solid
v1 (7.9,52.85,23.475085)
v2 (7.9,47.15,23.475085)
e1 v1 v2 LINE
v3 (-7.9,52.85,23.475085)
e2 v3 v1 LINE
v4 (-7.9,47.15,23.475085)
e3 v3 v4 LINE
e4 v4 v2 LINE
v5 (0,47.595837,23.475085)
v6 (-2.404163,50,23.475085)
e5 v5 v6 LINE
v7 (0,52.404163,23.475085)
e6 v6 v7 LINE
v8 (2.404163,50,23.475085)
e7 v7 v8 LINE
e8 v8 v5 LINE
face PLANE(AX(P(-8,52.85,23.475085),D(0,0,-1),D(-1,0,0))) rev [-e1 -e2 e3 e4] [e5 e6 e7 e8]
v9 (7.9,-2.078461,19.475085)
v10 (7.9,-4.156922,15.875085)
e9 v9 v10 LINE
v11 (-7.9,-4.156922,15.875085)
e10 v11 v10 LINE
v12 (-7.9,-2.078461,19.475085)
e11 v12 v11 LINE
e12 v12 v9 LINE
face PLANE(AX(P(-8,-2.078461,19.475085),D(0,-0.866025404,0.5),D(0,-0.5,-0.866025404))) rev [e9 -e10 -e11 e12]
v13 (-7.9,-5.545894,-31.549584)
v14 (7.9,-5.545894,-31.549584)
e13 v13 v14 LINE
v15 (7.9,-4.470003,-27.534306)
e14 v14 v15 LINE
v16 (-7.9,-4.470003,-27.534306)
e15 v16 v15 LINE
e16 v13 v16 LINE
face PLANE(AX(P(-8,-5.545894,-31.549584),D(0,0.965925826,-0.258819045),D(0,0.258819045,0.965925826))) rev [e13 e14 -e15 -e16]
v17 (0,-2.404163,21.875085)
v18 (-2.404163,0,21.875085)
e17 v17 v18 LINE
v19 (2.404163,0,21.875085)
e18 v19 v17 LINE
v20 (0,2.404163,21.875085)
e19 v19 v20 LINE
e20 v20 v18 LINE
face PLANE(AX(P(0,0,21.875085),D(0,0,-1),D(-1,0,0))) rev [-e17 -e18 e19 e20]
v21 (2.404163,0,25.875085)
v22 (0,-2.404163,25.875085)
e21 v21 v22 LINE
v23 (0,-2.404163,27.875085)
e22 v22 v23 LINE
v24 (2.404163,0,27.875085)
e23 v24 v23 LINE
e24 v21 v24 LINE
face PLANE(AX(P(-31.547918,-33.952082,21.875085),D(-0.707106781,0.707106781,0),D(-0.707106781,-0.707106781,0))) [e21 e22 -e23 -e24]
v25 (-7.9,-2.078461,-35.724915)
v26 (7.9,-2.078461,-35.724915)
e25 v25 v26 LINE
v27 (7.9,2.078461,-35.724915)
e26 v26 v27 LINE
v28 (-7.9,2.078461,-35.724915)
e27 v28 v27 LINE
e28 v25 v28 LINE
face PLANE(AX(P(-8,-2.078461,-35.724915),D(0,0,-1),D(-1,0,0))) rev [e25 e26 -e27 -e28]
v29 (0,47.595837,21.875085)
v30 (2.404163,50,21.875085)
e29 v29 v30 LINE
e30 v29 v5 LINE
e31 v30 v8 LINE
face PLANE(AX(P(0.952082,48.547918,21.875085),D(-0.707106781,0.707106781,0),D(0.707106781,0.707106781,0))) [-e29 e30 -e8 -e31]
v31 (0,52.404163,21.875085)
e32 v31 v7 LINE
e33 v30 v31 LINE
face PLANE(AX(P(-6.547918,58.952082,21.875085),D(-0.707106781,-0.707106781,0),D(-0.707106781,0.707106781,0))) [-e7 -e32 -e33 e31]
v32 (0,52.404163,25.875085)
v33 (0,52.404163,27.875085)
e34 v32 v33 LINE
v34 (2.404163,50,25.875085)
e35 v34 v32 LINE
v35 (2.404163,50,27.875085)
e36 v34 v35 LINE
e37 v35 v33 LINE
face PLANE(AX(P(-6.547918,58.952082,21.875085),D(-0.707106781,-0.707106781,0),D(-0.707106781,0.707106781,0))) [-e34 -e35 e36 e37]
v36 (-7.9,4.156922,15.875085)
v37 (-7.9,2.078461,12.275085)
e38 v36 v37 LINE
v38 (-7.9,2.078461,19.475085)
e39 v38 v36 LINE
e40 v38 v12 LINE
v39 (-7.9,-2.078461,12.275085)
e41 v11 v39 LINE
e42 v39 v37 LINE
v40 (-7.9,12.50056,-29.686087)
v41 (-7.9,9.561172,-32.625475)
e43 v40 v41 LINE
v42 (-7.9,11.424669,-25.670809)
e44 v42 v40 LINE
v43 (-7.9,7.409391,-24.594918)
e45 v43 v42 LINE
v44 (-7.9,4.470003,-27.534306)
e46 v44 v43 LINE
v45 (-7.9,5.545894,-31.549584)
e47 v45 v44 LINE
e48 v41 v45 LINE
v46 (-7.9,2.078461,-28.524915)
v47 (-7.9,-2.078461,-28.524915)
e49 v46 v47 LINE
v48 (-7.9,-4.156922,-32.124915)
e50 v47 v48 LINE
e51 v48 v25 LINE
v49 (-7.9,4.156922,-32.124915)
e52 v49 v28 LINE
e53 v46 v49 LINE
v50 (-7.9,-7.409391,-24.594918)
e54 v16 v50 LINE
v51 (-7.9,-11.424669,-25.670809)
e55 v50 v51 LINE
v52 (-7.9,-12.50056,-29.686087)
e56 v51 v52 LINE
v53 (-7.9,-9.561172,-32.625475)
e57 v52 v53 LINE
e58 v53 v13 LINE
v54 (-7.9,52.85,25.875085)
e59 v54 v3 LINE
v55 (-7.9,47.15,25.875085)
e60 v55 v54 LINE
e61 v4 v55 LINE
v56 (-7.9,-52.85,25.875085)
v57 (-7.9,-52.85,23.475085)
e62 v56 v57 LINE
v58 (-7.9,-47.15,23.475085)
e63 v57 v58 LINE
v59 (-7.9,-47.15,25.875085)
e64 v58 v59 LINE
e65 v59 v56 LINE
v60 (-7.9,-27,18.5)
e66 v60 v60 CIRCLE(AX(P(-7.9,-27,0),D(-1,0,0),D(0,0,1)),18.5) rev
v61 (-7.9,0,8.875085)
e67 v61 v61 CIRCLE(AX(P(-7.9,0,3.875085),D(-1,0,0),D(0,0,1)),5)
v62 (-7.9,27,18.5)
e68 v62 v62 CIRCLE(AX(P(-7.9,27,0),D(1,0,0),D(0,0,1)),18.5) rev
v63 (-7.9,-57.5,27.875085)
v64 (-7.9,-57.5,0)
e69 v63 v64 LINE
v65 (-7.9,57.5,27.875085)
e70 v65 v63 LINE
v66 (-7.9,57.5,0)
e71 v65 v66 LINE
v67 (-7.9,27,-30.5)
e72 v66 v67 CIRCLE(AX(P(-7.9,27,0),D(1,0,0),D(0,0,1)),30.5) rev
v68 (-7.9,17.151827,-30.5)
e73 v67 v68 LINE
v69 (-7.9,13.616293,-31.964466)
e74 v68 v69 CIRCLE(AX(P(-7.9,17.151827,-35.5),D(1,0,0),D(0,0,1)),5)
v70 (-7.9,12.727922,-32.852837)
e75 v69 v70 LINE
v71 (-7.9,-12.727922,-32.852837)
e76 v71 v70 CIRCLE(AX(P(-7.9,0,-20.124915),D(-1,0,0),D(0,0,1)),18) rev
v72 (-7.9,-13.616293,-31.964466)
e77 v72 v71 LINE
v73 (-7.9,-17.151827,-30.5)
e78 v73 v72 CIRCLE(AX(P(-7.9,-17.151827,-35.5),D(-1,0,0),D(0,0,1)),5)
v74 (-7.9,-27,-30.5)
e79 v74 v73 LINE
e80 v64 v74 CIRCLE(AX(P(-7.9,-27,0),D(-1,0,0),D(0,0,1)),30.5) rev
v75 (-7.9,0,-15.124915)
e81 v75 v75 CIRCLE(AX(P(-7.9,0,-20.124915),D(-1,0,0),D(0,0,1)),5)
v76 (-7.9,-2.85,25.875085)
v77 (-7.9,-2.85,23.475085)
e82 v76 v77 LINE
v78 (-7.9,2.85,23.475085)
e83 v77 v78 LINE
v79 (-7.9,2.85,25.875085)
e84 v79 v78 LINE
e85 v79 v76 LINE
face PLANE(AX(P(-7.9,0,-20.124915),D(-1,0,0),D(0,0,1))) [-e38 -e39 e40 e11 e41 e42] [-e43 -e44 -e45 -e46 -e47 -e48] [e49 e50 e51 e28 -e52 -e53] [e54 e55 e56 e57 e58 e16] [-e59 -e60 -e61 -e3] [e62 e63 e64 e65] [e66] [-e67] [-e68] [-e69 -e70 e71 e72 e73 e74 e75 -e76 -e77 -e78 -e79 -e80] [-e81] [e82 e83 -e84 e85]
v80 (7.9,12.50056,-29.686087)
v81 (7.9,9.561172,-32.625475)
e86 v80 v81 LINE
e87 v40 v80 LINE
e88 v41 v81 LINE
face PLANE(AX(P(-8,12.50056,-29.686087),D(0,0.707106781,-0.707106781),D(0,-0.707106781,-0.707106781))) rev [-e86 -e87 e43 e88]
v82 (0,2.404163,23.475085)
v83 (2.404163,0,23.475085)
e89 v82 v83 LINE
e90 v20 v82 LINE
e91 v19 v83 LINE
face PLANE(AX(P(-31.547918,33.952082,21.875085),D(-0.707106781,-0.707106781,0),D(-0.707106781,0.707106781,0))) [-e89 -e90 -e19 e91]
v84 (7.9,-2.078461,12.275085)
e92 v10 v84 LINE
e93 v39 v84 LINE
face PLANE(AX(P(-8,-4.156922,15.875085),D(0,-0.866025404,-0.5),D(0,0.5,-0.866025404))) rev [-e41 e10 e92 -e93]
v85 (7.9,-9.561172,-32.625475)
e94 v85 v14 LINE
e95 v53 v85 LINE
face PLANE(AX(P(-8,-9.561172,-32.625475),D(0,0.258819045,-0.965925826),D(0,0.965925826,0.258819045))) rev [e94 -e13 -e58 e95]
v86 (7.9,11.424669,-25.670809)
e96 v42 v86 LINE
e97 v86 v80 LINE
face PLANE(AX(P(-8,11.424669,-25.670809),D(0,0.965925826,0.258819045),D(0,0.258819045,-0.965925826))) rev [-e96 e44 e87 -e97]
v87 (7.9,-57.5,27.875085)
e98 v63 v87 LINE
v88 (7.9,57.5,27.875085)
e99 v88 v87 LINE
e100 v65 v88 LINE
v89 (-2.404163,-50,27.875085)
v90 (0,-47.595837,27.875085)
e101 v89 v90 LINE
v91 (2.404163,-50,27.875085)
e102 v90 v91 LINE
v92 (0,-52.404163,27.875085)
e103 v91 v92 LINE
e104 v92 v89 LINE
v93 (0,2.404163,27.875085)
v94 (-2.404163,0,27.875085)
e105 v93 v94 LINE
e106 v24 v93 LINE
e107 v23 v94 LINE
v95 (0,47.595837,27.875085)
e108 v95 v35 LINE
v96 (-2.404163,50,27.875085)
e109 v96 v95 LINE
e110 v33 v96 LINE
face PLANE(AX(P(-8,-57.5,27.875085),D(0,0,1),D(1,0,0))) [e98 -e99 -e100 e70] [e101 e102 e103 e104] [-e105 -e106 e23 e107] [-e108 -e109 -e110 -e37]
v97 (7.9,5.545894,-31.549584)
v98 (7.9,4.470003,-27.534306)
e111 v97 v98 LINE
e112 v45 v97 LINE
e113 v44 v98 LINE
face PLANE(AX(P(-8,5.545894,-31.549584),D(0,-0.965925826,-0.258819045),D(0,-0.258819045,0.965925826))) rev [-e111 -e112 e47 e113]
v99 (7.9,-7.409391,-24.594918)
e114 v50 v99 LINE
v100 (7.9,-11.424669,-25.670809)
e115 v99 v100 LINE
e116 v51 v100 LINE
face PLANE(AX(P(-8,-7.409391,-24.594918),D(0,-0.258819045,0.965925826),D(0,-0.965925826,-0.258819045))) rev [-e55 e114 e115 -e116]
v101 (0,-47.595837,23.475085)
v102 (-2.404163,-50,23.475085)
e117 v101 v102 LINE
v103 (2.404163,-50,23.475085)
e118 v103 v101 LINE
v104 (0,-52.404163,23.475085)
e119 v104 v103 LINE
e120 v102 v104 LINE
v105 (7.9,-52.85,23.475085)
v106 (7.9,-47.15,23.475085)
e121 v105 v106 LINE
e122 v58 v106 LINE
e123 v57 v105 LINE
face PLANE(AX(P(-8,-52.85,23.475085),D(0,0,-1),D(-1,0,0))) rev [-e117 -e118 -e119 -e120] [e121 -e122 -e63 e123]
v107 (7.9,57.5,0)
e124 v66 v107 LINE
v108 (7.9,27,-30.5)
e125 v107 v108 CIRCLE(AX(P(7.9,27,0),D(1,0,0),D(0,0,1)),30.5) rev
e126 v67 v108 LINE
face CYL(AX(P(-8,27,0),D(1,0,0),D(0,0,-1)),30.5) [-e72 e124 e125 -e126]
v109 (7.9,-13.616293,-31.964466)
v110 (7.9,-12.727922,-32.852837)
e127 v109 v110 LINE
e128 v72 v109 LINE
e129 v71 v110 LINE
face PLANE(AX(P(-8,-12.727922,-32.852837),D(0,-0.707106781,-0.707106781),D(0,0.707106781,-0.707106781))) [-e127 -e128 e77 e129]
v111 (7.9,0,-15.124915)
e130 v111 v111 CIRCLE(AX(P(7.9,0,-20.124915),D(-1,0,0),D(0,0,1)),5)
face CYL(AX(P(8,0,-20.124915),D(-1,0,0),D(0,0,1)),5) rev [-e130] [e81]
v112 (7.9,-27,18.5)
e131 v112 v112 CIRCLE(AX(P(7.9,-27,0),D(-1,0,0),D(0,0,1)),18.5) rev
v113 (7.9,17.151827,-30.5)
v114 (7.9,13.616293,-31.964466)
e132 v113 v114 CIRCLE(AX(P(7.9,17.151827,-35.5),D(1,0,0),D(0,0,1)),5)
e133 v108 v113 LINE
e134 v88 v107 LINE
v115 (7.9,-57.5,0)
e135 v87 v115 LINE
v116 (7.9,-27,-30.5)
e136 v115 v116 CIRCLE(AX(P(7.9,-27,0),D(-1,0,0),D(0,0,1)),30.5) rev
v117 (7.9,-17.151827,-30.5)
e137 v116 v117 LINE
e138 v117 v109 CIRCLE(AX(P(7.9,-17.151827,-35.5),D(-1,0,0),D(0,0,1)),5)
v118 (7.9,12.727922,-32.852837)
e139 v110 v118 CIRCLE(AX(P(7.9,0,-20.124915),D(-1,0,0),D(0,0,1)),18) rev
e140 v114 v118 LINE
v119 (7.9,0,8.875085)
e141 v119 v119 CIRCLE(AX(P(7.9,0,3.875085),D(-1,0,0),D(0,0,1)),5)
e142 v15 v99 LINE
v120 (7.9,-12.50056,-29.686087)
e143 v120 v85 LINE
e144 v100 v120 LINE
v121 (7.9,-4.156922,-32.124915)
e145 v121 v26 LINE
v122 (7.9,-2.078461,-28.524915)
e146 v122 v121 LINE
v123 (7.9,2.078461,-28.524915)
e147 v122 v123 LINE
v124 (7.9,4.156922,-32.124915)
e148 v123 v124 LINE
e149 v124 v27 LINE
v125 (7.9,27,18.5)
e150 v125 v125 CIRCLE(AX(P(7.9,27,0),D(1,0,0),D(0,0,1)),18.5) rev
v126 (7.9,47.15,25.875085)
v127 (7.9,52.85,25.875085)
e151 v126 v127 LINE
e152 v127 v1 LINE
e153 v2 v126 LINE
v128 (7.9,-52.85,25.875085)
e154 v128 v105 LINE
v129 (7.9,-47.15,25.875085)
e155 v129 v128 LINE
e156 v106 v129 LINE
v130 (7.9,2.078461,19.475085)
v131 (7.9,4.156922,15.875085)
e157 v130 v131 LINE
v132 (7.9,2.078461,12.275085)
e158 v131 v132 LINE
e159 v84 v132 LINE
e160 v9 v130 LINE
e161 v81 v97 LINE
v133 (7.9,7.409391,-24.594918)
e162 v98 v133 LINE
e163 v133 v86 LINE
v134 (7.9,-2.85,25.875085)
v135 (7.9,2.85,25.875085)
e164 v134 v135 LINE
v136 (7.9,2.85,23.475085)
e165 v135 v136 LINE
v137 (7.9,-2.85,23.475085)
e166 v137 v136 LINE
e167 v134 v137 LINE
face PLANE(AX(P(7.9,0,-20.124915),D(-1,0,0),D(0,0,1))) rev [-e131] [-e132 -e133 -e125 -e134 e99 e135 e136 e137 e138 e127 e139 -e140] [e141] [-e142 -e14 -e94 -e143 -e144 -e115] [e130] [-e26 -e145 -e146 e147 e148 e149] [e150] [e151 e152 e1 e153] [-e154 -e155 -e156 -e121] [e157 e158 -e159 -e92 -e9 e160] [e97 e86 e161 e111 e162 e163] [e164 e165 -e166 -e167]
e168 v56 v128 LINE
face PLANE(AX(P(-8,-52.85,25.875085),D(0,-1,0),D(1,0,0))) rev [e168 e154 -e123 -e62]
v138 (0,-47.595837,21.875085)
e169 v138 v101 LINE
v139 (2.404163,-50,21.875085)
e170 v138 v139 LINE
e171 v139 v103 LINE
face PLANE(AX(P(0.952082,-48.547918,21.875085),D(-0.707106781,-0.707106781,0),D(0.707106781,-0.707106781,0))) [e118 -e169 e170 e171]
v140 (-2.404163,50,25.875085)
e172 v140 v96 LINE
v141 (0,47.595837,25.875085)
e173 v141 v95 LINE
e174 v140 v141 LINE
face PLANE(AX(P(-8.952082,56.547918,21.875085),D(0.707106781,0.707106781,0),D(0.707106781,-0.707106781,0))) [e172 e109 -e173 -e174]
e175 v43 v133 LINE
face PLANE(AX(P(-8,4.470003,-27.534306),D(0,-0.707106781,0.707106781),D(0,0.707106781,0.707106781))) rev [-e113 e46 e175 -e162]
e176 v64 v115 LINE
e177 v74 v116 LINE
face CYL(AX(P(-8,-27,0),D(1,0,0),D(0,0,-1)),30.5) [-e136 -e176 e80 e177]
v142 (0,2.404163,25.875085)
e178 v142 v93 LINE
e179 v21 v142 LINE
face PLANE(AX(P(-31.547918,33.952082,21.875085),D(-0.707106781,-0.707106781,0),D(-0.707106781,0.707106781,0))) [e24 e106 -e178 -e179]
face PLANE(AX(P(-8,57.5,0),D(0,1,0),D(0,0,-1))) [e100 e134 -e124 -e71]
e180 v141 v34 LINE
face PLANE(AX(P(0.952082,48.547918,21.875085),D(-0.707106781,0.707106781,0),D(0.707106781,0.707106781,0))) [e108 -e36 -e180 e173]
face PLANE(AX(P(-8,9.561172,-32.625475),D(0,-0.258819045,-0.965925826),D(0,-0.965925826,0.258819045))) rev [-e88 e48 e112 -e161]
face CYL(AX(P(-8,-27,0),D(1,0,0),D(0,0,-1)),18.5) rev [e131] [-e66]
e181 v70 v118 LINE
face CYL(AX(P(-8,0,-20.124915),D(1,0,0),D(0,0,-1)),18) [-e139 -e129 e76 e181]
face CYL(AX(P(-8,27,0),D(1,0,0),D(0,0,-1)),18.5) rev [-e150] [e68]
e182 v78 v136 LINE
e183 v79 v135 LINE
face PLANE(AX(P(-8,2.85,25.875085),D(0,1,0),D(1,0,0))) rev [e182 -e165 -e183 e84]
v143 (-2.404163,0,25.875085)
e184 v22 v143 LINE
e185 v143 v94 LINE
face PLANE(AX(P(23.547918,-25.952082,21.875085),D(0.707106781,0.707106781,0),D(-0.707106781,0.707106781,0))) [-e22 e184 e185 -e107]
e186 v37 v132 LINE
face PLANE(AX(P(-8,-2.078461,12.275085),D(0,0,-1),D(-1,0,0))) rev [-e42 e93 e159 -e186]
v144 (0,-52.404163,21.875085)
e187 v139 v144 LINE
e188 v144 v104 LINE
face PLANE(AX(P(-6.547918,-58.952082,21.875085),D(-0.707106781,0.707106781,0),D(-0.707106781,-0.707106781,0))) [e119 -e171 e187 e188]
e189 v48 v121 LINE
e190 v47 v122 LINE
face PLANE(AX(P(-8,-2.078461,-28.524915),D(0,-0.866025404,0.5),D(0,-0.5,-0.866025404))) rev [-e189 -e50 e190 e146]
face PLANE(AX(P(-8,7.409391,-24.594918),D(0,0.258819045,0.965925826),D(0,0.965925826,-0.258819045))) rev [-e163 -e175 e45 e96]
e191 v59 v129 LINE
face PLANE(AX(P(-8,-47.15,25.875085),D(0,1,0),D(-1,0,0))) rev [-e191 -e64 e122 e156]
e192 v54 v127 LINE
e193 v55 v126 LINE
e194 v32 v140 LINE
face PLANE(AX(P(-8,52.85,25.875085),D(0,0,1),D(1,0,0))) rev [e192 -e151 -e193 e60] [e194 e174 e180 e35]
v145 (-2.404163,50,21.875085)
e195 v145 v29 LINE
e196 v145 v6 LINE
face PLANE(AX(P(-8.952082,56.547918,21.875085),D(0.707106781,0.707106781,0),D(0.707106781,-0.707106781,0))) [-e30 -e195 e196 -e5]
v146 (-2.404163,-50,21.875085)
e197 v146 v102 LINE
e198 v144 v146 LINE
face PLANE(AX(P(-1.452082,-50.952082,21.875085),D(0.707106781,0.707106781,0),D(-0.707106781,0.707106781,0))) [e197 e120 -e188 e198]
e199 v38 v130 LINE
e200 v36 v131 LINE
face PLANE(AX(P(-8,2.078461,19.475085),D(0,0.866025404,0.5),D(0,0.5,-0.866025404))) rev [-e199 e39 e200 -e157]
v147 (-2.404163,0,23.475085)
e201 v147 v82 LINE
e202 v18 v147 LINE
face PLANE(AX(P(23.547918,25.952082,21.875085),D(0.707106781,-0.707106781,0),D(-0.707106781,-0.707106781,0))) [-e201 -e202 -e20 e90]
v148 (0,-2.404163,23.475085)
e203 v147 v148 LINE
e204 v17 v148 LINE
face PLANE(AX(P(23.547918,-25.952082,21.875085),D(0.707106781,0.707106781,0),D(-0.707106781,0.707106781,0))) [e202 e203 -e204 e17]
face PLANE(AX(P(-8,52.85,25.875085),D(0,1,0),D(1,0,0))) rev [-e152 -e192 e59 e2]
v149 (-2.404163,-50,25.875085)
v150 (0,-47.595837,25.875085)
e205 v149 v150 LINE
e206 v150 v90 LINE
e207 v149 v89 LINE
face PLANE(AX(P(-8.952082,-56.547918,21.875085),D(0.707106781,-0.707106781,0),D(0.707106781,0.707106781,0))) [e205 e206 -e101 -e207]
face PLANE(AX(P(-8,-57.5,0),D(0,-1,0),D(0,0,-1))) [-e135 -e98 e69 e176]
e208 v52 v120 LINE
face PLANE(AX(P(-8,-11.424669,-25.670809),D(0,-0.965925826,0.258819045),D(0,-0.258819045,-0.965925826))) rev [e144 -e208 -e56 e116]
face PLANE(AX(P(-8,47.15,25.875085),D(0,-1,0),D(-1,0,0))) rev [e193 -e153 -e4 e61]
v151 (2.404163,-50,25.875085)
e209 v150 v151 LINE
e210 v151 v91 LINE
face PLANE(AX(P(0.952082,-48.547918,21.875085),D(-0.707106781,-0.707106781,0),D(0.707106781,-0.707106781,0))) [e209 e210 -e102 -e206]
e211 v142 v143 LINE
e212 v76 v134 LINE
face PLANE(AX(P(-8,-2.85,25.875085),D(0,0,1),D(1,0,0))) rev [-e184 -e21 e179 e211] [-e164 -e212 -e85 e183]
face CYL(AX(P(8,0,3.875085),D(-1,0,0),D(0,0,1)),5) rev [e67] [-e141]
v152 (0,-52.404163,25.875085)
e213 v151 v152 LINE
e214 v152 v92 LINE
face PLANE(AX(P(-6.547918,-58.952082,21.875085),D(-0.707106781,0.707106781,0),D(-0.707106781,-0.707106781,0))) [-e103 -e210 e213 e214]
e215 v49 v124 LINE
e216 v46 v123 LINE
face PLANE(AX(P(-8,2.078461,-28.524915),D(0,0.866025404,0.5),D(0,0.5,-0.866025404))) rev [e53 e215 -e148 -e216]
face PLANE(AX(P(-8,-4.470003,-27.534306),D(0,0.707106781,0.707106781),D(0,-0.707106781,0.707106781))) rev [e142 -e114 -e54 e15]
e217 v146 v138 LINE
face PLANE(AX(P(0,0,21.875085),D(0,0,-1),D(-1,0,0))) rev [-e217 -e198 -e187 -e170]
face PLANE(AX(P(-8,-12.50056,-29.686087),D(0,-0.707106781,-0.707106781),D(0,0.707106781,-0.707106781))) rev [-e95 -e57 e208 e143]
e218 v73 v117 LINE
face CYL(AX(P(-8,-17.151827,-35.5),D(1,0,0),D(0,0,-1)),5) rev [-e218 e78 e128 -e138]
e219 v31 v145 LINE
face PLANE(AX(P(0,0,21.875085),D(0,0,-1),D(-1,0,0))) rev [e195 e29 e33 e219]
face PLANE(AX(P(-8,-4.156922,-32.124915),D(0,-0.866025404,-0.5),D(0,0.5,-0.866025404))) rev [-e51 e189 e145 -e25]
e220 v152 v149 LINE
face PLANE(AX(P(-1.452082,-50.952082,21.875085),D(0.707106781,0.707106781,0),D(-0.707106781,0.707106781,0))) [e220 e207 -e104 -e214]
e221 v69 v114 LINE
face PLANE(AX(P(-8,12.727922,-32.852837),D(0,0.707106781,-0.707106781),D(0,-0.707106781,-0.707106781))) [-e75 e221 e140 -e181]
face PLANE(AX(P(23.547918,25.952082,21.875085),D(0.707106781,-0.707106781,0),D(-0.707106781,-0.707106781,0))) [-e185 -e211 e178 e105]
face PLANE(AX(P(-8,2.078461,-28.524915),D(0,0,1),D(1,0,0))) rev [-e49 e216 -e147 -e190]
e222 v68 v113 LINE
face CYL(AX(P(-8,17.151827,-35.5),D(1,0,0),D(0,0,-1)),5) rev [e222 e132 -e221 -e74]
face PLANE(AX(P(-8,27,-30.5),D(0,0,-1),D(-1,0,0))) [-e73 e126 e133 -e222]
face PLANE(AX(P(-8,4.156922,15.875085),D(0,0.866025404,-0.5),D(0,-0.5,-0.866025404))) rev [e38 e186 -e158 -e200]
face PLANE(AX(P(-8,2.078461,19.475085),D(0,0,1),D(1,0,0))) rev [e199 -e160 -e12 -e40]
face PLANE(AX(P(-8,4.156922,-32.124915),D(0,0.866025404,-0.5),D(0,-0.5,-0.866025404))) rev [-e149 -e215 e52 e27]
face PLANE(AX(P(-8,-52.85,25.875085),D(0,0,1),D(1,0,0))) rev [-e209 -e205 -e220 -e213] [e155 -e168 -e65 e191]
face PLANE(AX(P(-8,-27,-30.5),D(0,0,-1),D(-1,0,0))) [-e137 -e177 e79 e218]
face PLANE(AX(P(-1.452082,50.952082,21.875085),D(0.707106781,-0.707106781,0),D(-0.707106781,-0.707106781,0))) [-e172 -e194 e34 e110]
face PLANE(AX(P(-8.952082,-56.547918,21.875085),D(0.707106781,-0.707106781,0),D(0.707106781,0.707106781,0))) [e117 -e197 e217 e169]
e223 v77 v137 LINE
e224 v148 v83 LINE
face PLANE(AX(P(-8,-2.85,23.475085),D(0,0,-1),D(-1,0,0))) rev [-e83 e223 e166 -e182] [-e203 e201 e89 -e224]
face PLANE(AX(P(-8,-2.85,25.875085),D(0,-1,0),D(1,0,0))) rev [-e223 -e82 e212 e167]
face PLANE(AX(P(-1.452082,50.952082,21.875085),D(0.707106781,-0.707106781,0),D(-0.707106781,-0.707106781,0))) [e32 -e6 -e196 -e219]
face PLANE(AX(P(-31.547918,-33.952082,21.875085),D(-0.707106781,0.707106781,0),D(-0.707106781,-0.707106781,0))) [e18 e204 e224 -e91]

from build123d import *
from build123d.topology import SkipClean

# Parameters (mm, degrees)
BOSS_EXTRUDE1_DEPTH     = 8
CUT_EXTRUDE1_DEPTH      = 78.453287602
CUT_EXTRUDE1_DEPTH_BACK = 70.453287602
CUT_EXTRUDE1_START      = -8
SKETCH9_R               = 5
CUT_EXTRUDE2_DEPTH      = 70.453287602
CUT_EXTRUDE2_DEPTH_BACK = 70.453287602
CUT_EXTRUDE3_DEPTH      = 70.453287602
CUT_EXTRUDE3_DEPTH_BACK = 70.453287602
SKETCH11_R              = 18.5
CUT_EXTRUDE4_DEPTH      = 70.453287602
CUT_EXTRUDE4_DEPTH_BACK = 70.453287602
SKETCH12_W              = 5.7
SKETCH12_H              = 2.4
CUT_EXTRUDE5_START      = 27.875085
CUT_EXTRUDE5_DEPTH      = 6
MOVE_START              = -8
MOVE_FACE1_OUTLINE_W    = 5.7
MOVE_FACE1_OUTLINE_H    = 2.4
MOVE_FACE1_OUTLINE_R    = 18.5
MOVE_FACE1_DEPTH        = 0.1
MOVE_START_2            = 7.9
MOVE_FACE1_2_OUTLINE_W  = 5.7
MOVE_FACE1_2_OUTLINE_H  = 2.4
MOVE_FACE1_2_OUTLINE_R  = 18.5
MOVE_FACE1_2_DEPTH      = 0.1


# Read off the part's stored shape, not the designer's step: Move Face1
with BuildPart() as part:
    # Sketch2 → Boss-Extrude1 (new, symmetric)
    with BuildSketch(Plane.YZ):
        with BuildLine():
            Line((-12.727922061, -32.852837258), (-13.616293225, -31.964466094))
            ThreePointArc((-13.616293225, -31.964466094), (-15.238409969, -30.880602337), (-17.151827131, -30.5))
            Line((-17.151827131, -30.5), (-27, -30.5))
            ThreePointArc((-27, -30.5), (-48.566756826, -21.566756826), (-57.5, 0))
            Line((-57.5, 0), (-57.5, 27.875084803))
            Line((-57.5, 27.875084803), (0, 27.875084803))
            Line((0, 27.875084803), (0, -38.124915197))
            ThreePointArc((0, -38.124915197), (-6.888301783, -36.754746782), (-12.727922061, -32.852837258))
        make_face()
    extrude(amount=BOSS_EXTRUDE1_DEPTH, both=True)

    # Sketch9 → Cut-Extrude1 (cut, two sides: drawn at the far end of the back side and taken through both)
    with BuildSketch(Plane.YZ.offset(CUT_EXTRUDE1_START - CUT_EXTRUDE1_DEPTH_BACK)):
        with Locations((0, 3.875084803)):
            Circle(SKETCH9_R)
        with Locations((0, -20.124915197)):
            Circle(SKETCH9_R)
    extrude(amount=CUT_EXTRUDE1_DEPTH + CUT_EXTRUDE1_DEPTH_BACK, mode=Mode.SUBTRACT)

    # Sketch10 → Cut-Extrude2 (cut, two sides: drawn at the far end of the back side and taken through both)
    with BuildSketch(Plane.YZ.offset(-CUT_EXTRUDE2_DEPTH_BACK)):
        Polygon((2.078460969, 12.275084803), (4.156921938, 15.875084803), (2.078460969, 19.475084803), (-2.078460969, 19.475084803), (-4.156921938, 15.875084803), (-2.078460969, 12.275084803), align=None)
        Polygon((-5.545893683, -31.549584262), (-4.470003116, -27.534306004), (-7.409390808, -24.594918313), (-11.424669066, -25.67080888), (-12.500559632, -29.686087138), (-9.561171941, -32.625474829), align=None)
        Polygon((4.156921938, -32.124915197), (2.078460969, -28.524915197), (-2.078460969, -28.524915197), (-4.156921938, -32.124915197), (-2.078460969, -35.724915197), (2.078460969, -35.724915197), align=None)
        Polygon((12.500559632, -29.686087138), (11.424669066, -25.67080888), (7.409390808, -24.594918313), (4.470003116, -27.534306004), (5.545893683, -31.549584262), (9.561171941, -32.625474829), align=None)
    extrude(amount=CUT_EXTRUDE2_DEPTH + CUT_EXTRUDE2_DEPTH_BACK, mode=Mode.SUBTRACT)

    # Sketch11 → Cut-Extrude3 (cut, two sides: drawn at the far end of the back side and taken through both)
    with BuildSketch(Plane.YZ.offset(-CUT_EXTRUDE3_DEPTH_BACK)):
        with Locations(Location((-27, 0, 0), (0, 0, 270))):
            Circle(SKETCH11_R)
    extrude(amount=CUT_EXTRUDE3_DEPTH + CUT_EXTRUDE3_DEPTH_BACK, mode=Mode.SUBTRACT)

    # Sketch12 → Cut-Extrude4 (cut, two sides: drawn at the far end of the back side and taken through both)
    with BuildSketch(Plane.YZ.offset(-CUT_EXTRUDE4_DEPTH_BACK)):
        with Locations((-50, 24.675084803)):
            Rectangle(SKETCH12_W, SKETCH12_H)
        with Locations((0, 24.675084803)):
            Rectangle(SKETCH12_W, SKETCH12_H)
    extrude(amount=CUT_EXTRUDE4_DEPTH + CUT_EXTRUDE4_DEPTH_BACK, mode=Mode.SUBTRACT)

    # Sketch13 → Cut-Extrude5 (cut)
    with BuildSketch(Plane.XY.offset(CUT_EXTRUDE5_START)):
        Polygon((0, -2.404163056), (2.404163056, 0), (0, 2.404163056), (-2.404163056, 0), align=None)
        Polygon((0, -52.404163056), (2.404163056, -50), (0, -47.595836944), (-2.404163056, -50), align=None)
    extrude(amount=-CUT_EXTRUDE5_DEPTH, mode=Mode.SUBTRACT)

    # Move Face1 outline → Move Face1 (cut)
    with BuildSketch(Plane.YZ.offset(MOVE_START)):
        with BuildLine():
            Line((-2.85, 25.875084803), (0, 25.875084803))
            Line((0, 25.875084803), (0, 27.875084803))
            Line((0, 27.875084803), (-57.5, 27.875084803))
            Line((-57.5, 27.875084803), (-57.5, 0))
            ThreePointArc((-57.5, 0), (-48.566756826, -21.566756826), (-27, -30.5))
            Line((-27, -30.5), (-17.151827131, -30.5))
            ThreePointArc((-17.151827131, -30.5), (-15.238409969, -30.880602337), (-13.616293225, -31.964466094))
            Line((-13.616293225, -31.964466094), (-12.727922061, -32.852837258))
            ThreePointArc((-12.727922061, -32.852837258), (-6.888301783, -36.754746782), (0, -38.124915197))
            Line((0, -38.124915197), (0, -35.724915197))
            Line((0, -35.724915197), (-2.078460969, -35.724915197))
            Line((-2.078460969, -35.724915197), (-4.156921938, -32.124915197))
            Line((-4.156921938, -32.124915197), (-2.078460969, -28.524915197))
            Line((-2.078460969, -28.524915197), (0, -28.524915197))
            Line((0, -28.524915197), (0, -25.124915197))
            ThreePointArc((0, -25.124915197), (-5, -20.124915197), (0, -15.124915197))
            Line((0, -15.124915197), (0, -1.124915197))
            ThreePointArc((0, -1.124915197), (-5, 3.875084803), (0, 8.875084803))
            Line((0, 8.875084803), (0, 12.275084803))
            Line((0, 12.275084803), (-2.078460969, 12.275084803))
            Line((-2.078460969, 12.275084803), (-4.156921938, 15.875084803))
            Line((-4.156921938, 15.875084803), (-2.078460969, 19.475084803))
            Line((-2.078460969, 19.475084803), (0, 19.475084803))
            Line((0, 19.475084803), (0, 23.475084803))
            Line((0, 23.475084803), (-2.85, 23.475084803))
            Line((-2.85, 23.475084803), (-2.85, 25.875084803))
        make_face()
        Polygon((-5.545893683, -31.549584262), (-9.561171941, -32.625474829), (-12.500559632, -29.686087138), (-11.424669066, -25.67080888), (-7.409390808, -24.594918313), (-4.470003116, -27.534306004), align=None, mode=Mode.SUBTRACT)
        with Locations((-50, 24.675084803)):
            Rectangle(MOVE_FACE1_OUTLINE_W, MOVE_FACE1_OUTLINE_H, mode=Mode.SUBTRACT)
        with Locations((-27, 0)):
            Circle(MOVE_FACE1_OUTLINE_R, mode=Mode.SUBTRACT)
    extrude(amount=MOVE_FACE1_DEPTH, mode=Mode.SUBTRACT)

    # Move Face1 2 outline → Move Face1 2 (cut)
    with BuildSketch(Plane.YZ.offset(MOVE_START_2)):
        with BuildLine():
            Line((-2.85, 25.875084803), (0, 25.875084803))
            Line((0, 25.875084803), (0, 27.875084803))
            Line((0, 27.875084803), (-57.5, 27.875084803))
            Line((-57.5, 27.875084803), (-57.5, 0))
            ThreePointArc((-57.5, 0), (-48.566756826, -21.566756826), (-27, -30.5))
            Line((-27, -30.5), (-17.151827131, -30.5))
            ThreePointArc((-17.151827131, -30.5), (-15.238409969, -30.880602337), (-13.616293225, -31.964466094))
            Line((-13.616293225, -31.964466094), (-12.727922061, -32.852837258))
            ThreePointArc((-12.727922061, -32.852837258), (-6.888301783, -36.754746782), (0, -38.124915197))
            Line((0, -38.124915197), (0, -35.724915197))
            Line((0, -35.724915197), (-2.078460969, -35.724915197))
            Line((-2.078460969, -35.724915197), (-4.156921938, -32.124915197))
            Line((-4.156921938, -32.124915197), (-2.078460969, -28.524915197))
            Line((-2.078460969, -28.524915197), (0, -28.524915197))
            Line((0, -28.524915197), (0, -25.124915197))
            ThreePointArc((0, -25.124915197), (-5, -20.124915197), (0, -15.124915197))
            Line((0, -15.124915197), (0, -1.124915197))
            ThreePointArc((0, -1.124915197), (-5, 3.875084803), (0, 8.875084803))
            Line((0, 8.875084803), (0, 12.275084803))
            Line((0, 12.275084803), (-2.078460969, 12.275084803))
            Line((-2.078460969, 12.275084803), (-4.156921938, 15.875084803))
            Line((-4.156921938, 15.875084803), (-2.078460969, 19.475084803))
            Line((-2.078460969, 19.475084803), (0, 19.475084803))
            Line((0, 19.475084803), (0, 23.475084803))
            Line((0, 23.475084803), (-2.85, 23.475084803))
            Line((-2.85, 23.475084803), (-2.85, 25.875084803))
        make_face()
        Polygon((-5.545893683, -31.549584262), (-9.561171941, -32.625474829), (-12.500559632, -29.686087138), (-11.424669066, -25.67080888), (-7.409390808, -24.594918313), (-4.470003116, -27.534306004), align=None, mode=Mode.SUBTRACT)
        with Locations((-50, 24.675084803)):
            Rectangle(MOVE_FACE1_2_OUTLINE_W, MOVE_FACE1_2_OUTLINE_H, mode=Mode.SUBTRACT)
        with Locations((-27, 0)):
            Circle(MOVE_FACE1_2_OUTLINE_R, mode=Mode.SUBTRACT)
    extrude(amount=MOVE_FACE1_2_DEPTH, mode=Mode.SUBTRACT)

    # Mirror1: part across plane


with BuildPart() as part_1:
    with SkipClean():  # the faces are left unmerged after this step: merging them gives an invalid solid
        add(part.part)
        add(part.part.mirror(Plane(origin=(0, 0, 0), x_dir=(0, 0, 1), z_dir=(0, -1, 0))))


solid = part_1.part
